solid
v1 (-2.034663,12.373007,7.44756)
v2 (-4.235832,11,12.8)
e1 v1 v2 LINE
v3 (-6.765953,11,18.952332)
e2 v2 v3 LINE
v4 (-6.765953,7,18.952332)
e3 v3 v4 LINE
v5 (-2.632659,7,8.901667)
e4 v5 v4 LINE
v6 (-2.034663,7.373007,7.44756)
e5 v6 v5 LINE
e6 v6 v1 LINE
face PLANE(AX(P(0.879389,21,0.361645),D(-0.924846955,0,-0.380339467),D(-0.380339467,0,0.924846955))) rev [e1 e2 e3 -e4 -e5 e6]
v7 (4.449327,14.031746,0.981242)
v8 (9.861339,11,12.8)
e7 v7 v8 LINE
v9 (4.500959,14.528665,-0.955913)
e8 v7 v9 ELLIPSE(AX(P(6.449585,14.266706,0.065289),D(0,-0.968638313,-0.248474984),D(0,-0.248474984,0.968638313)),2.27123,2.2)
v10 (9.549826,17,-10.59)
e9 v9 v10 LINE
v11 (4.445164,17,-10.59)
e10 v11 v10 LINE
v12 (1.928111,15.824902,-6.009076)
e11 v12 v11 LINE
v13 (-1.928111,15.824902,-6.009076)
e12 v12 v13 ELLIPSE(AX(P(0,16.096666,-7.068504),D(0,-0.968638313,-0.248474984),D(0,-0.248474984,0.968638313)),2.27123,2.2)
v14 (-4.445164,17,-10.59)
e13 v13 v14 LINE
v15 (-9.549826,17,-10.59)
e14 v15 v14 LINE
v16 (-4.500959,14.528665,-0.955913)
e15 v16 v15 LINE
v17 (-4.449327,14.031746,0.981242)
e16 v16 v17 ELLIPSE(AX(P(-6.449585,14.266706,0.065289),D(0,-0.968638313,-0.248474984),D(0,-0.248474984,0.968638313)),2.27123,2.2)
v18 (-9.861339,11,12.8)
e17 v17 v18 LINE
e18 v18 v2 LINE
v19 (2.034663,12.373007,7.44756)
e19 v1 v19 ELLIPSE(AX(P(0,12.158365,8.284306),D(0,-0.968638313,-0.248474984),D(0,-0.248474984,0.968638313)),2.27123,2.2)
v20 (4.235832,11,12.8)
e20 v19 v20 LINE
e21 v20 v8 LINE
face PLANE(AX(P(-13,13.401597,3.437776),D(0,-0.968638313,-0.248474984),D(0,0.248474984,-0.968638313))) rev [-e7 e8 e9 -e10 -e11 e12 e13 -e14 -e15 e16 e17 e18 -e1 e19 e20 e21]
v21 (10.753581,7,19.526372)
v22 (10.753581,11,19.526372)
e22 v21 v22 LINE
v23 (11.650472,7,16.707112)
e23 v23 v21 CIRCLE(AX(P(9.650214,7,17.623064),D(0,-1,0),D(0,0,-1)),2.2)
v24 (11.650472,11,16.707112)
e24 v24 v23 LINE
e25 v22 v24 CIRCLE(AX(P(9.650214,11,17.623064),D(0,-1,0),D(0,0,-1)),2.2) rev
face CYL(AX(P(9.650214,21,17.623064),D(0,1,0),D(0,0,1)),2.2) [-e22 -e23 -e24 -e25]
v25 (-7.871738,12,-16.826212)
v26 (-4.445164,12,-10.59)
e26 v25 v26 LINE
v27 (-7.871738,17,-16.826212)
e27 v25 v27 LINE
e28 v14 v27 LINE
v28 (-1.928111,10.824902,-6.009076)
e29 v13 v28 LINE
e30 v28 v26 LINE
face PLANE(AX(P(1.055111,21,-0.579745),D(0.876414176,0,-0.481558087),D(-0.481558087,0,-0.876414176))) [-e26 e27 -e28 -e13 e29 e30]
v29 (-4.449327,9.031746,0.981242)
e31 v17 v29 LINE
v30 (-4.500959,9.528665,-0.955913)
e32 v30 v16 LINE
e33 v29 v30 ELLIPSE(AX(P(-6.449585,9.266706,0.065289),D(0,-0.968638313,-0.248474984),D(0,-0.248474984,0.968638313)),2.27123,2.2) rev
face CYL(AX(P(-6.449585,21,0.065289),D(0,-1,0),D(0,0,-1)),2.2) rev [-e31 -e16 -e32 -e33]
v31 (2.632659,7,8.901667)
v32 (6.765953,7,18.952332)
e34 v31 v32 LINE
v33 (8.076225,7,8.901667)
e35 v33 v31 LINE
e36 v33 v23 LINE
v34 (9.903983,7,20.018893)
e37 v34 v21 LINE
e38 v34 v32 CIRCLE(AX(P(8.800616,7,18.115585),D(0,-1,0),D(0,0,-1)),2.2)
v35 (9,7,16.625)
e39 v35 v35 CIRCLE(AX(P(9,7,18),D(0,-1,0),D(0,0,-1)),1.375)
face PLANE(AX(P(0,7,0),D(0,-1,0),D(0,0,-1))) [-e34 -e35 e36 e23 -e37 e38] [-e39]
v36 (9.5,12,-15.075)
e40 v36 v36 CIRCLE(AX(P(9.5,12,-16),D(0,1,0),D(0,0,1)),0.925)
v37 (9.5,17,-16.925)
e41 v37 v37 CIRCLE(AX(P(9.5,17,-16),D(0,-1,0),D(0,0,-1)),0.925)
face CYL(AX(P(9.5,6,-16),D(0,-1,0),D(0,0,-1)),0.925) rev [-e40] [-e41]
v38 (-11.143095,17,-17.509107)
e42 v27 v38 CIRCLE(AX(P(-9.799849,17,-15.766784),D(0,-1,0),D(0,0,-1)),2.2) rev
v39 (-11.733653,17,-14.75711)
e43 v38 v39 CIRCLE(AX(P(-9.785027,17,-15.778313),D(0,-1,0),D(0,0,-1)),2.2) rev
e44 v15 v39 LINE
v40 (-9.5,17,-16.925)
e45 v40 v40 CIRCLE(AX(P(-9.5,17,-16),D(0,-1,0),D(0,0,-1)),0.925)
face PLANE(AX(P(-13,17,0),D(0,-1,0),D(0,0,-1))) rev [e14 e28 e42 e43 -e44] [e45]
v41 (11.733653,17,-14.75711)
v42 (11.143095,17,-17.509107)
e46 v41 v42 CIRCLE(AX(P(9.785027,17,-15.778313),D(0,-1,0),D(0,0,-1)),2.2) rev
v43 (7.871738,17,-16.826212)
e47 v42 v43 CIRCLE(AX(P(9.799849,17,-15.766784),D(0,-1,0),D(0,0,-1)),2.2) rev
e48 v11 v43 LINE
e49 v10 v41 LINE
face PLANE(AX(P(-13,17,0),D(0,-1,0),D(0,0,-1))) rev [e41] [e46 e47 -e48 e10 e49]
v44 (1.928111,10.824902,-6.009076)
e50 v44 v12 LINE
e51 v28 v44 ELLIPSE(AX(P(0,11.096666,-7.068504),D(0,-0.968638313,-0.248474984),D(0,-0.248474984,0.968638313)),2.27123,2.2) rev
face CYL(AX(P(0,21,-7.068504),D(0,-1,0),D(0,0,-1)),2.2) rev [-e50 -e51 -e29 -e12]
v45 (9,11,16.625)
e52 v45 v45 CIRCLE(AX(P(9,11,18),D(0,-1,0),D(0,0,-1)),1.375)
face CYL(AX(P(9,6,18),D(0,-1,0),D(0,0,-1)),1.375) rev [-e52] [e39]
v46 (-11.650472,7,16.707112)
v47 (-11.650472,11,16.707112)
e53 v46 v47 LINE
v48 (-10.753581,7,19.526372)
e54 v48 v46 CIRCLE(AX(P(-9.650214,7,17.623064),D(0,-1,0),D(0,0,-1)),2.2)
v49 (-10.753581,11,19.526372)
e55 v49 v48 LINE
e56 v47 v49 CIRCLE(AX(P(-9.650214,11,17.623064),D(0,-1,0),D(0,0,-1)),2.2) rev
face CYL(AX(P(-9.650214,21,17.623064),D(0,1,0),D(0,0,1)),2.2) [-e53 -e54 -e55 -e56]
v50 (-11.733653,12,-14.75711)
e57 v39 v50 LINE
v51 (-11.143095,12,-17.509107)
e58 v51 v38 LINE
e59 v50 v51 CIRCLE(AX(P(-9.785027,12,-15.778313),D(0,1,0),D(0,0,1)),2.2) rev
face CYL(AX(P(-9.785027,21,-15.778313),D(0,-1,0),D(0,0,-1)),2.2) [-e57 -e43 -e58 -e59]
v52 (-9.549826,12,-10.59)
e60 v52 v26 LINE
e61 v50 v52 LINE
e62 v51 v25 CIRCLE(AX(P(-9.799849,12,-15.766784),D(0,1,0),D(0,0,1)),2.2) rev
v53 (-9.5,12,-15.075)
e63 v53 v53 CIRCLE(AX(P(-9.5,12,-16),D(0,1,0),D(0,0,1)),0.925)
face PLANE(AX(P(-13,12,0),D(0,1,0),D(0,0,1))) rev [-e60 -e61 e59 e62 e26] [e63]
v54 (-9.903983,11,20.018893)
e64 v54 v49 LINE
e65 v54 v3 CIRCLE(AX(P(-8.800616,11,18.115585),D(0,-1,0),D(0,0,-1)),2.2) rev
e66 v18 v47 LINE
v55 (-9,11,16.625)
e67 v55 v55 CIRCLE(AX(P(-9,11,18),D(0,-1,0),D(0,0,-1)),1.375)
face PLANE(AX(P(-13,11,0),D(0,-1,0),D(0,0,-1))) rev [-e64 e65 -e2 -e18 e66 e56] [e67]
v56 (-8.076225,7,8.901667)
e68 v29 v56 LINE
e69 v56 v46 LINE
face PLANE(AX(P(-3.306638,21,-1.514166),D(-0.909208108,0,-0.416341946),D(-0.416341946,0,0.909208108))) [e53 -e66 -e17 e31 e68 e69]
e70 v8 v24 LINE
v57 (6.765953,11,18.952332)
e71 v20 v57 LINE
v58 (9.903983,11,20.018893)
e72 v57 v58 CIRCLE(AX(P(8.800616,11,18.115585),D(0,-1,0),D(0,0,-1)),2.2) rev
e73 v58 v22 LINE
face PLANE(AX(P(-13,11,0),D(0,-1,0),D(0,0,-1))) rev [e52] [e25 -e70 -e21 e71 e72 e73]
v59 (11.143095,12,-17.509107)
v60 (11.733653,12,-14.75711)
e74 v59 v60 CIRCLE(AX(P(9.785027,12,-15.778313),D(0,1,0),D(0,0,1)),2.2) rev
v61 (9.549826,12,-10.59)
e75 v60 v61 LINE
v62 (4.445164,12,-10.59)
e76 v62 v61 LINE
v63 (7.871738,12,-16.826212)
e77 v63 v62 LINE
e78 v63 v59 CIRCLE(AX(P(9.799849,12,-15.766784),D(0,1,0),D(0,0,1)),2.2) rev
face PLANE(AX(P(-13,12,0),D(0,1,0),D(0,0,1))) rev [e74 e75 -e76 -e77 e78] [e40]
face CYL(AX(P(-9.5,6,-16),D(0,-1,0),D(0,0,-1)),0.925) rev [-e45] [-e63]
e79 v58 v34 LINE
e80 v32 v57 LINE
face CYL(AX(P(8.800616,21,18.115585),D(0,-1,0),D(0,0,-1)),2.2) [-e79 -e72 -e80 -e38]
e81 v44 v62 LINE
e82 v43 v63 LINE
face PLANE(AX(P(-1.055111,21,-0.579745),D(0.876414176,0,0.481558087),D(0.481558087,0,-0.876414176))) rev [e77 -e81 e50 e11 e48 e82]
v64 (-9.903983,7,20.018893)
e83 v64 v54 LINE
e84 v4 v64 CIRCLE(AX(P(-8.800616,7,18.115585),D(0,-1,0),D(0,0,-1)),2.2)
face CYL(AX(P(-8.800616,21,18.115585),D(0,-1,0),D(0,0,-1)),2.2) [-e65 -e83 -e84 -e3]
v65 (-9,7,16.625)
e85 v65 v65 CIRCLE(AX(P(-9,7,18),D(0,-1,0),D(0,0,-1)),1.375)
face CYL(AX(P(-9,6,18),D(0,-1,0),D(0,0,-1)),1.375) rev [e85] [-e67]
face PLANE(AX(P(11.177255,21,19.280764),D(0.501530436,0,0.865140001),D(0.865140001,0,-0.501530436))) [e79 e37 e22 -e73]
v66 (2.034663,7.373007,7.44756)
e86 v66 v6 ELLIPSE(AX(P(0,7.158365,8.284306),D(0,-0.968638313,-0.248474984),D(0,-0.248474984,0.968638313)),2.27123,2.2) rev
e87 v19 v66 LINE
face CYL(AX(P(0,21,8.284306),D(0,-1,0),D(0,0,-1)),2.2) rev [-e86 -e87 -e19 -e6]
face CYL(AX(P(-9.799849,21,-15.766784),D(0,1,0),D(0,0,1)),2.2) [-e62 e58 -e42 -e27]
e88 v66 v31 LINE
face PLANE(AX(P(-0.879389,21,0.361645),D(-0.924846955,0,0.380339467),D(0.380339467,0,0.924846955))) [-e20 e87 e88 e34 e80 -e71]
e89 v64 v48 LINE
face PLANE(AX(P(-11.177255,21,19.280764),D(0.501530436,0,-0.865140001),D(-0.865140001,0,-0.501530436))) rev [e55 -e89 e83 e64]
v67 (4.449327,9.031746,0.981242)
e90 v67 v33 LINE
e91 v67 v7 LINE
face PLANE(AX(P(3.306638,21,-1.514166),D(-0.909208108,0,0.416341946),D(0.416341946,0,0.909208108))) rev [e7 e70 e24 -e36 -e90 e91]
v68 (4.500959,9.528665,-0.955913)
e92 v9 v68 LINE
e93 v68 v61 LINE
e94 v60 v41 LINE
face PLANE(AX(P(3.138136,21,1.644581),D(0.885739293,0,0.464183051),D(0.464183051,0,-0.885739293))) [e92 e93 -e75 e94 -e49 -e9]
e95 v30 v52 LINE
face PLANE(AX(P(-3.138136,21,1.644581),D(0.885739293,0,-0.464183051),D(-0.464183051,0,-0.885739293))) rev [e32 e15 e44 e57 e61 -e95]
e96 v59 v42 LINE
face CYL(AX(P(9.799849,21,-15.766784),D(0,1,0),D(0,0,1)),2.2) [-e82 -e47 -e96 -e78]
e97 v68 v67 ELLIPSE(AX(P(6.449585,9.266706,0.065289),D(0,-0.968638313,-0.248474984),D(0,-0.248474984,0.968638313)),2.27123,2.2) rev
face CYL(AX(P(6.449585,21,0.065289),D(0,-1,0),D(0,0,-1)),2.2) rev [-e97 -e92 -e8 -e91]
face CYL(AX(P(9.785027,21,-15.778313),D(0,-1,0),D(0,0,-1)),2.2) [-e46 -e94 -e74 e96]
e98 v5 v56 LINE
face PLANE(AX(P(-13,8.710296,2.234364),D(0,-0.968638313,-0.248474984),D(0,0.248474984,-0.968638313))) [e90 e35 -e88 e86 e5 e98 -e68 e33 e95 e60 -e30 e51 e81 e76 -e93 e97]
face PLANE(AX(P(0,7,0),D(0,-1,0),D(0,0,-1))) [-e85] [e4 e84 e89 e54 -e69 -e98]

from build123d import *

# Parameters (mm, degrees)
SKETCH1_W               = 26
SKETCH1_H               = 41
SKETCH1_R               = 1.375
SKETCH1_R_2             = 0.925
SKETCH1_H_2             = 4.4
BOSS_EXTRUDE1_DEPTH     = 6
SKETCH2_R               = 0.925
SKETCH2_R_2             = 1.375
BOSS_EXTRUDE2_DEPTH     = 15
CUT_EXTRUDE2_DEPTH      = 42.677451937
CUT_EXTRUDE2_DEPTH_BACK = 42.677451937
SKETCH4_W               = 26
SKETCH4_H               = 45.4
CUT_EXTRUDE1_DEPTH      = 7
FILLET1_R               = 2.2
FILLET2_R               = 2.2


with BuildPart() as part:
    # Sketch1 → Boss-Extrude1 (new body)
    # profile 1 of 2: a face of its own
    with BuildSketch(Plane(origin=(0, 0, 0), x_dir=(1, 0, 0), z_dir=(0, 1, 0))):
        Rectangle(SKETCH1_W, SKETCH1_H)
        with Locations(Location((-9, -18, 0), (0, 0, 270))):
            Circle(SKETCH1_R, mode=Mode.SUBTRACT)
        with BuildLine():
            ThreePointArc((10.375, -18), (9, -19.375), (7.625, -18))
            ThreePointArc((7.625, -18), (9, -16.625), (10.375, -18))
        make_face(mode=Mode.SUBTRACT)
        with Locations(Location((-9.5, 16, 0), (0, 0, 270))):
            Circle(SKETCH1_R_2, mode=Mode.SUBTRACT)
        with BuildLine():
            ThreePointArc((10.425, 16), (9.5, 15.075), (8.575, 16))
            ThreePointArc((8.575, 16), (9.5, 16.925), (10.425, 16))
        make_face(mode=Mode.SUBTRACT)
    # profile 2 of 2: a face of its own
    with BuildSketch(Plane(origin=(0, 0, 0), x_dir=(1, 0, 0), z_dir=(0, 1, 0))):
        with Locations((0, -22.7)):
            Rectangle(SKETCH1_W, SKETCH1_H_2)
    extrude(amount=BOSS_EXTRUDE1_DEPTH)

    # Sketch2 → Boss-Extrude2 (add)
    # profile 1 of 6: a face of its own
    with BuildSketch(Plane(origin=(0, 6, 0), x_dir=(1, 0, 0), z_dir=(0, 1, 0))):
        Polygon((12.587244228, 16.385905528), (10.85066935, 17.736574878), (9.114094472, 19.087244228), (0, 2.5), (4, 2.5), (4, 0), align=None)
        with BuildLine():
            ThreePointArc((10.425, 16), (8.669058384, 15.593599912), (10.067895068, 16.730150801))
            ThreePointArc((10.067895068, 16.730150801), (10.330941616, 16.406400088), (10.425, 16))
        make_face(mode=Mode.SUBTRACT)
    # profile 2 of 6: a face of its own
    with BuildSketch(Plane(origin=(0, 6, 0), x_dir=(1, 0, 0), z_dir=(0, 1, 0))):
        Polygon((-4, 0), (-4, 2.5), (0, 2.5), (-9.114094472, 19.087244228), (-12.587244228, 16.385905528), align=None)
        with Locations(Location((-9.5, 16, 0), (0, 0, 270))):
            Circle(SKETCH2_R, mode=Mode.SUBTRACT)
    # profile 3 of 6: a face of its own
    with BuildSketch(Plane(origin=(0, 6, 0), x_dir=(1, 0, 0), z_dir=(0, 1, 0))):
        Polygon((0, 2.5), (-4, 2.5), (-4, 0), (-4, -2.5), (0, -2.5), align=None)
    # profile 4 of 6: a face of its own
    with BuildSketch(Plane(origin=(0, 6, 0), x_dir=(1, 0, 0), z_dir=(0, 1, 0))):
        Polygon((4, 2.5), (0, 2.5), (0, -2.5), (4, -2.5), (4, 0), align=None)
    # profile 5 of 6: a face of its own
    with BuildSketch(Plane(origin=(0, 6, 0), x_dir=(1, 0, 0), z_dir=(0, 1, 0))):
        Polygon((12.482501962, -18.524099305), (4, 0), (4, -2.5), (0, -2.5), (7.724231954, -21.282516701), (10.103366958, -19.903308003), align=None)
        with BuildLine():
            ThreePointArc((10.375, -18), (10.191392249, -18.686447019), (9.689604349, -19.189567502))
            ThreePointArc((9.689604349, -19.189567502), (7.808607751, -17.313552981), (10.375, -18))
        make_face(mode=Mode.SUBTRACT)
    # profile 6 of 6: a face of its own
    with BuildSketch(Plane(origin=(0, 6, 0), x_dir=(1, 0, 0), z_dir=(0, 1, 0))):
        Polygon((-4, -2.5), (-4, 0), (-12.482501962, -18.524099305), (-7.724231954, -21.282516701), (0, -2.5), align=None)
        with Locations(Location((-9, -18, 0), (0, 0, 270))):
            Circle(SKETCH2_R_2, mode=Mode.SUBTRACT)
    extrude(amount=BOSS_EXTRUDE2_DEPTH)

    # Sketch6 → Cut-Extrude2 (cut, two sides: drawn at the far end of the back side and taken through both)
    with BuildSketch(Plane(origin=(13, 0, 0), x_dir=(0, 0, -1), z_dir=(1, 0, 0)).offset(-CUT_EXTRUDE2_DEPTH_BACK)):
        Polygon((-21.28, 17), (-21.28, 11), (-12.8, 11), (10.59, 17), align=None)
        Polygon((10.59, 12), (-12.8, 6), (19.09, 6), (19.09, 12), align=None)
        Polygon((-21.28, 21.511868699), (-21.28, 17), (10.59, 17), (19.087244228, 17), (19.087244228, 21.511868699), align=None)
    extrude(amount=CUT_EXTRUDE2_DEPTH + CUT_EXTRUDE2_DEPTH_BACK, mode=Mode.SUBTRACT)

    # Sketch4 → Cut-Extrude1 (cut)
    with BuildSketch(Plane.XZ):
        with Locations((0, 2.2)):
            Rectangle(SKETCH4_W, SKETCH4_H)
    extrude(amount=-CUT_EXTRUDE1_DEPTH, mode=Mode.SUBTRACT)

    # Fillet1
    # the kernel refuses this fillet: 2.2 mm, written as the material it takes off along each edge
    with BuildSketch(Plane(origin=(12.587244228, 7.402722975, -16.385905528), x_dir=(-0.46418305146339667, 0, 0.8857392927572592), z_dir=(0, 1, 0))) as fillet1_piece_1:
        with BuildLine():
            CenterArc((FILLET1_R * 0.83586855008, -FILLET1_R), FILLET1_R, 90, 79.782379698)
            Line((-FILLET1_R * 0.148272552074, -FILLET1_R * 0.822612596131), (0, 0))
            Line((0, 0), (FILLET1_R * 0.83586855008, 0))
        make_face()
    extrude(amount=14.194554051, mode=Mode.SUBTRACT)
    with BuildSketch(Plane(origin=(9.114094472, 5.550330565, -19.087244228), x_dir=(-0.48155808709989106, 0, 0.8764141764877459), z_dir=(0, 1, 0))) as fillet1_piece_2:
        with BuildLine():
            CenterArc((FILLET1_R * 1.17266716994, FILLET1_R), FILLET1_R, 170.912229019, 99.087770981)
            Line((FILLET1_R * 0.185219628956, FILLET1_R * 1.15794731336), (0, 0))
            Line((0, 0), (FILLET1_R * 1.17266716994, 0))
        make_face()
    extrude(amount=17.899338869, mode=Mode.SUBTRACT)
    with BuildSketch(Plane(origin=(-9.114094472, 5.550330565, -19.087244228), x_dir=(0.4815580870998917, 0, 0.8764141764877456), z_dir=(0, 1, 0))) as fillet1_piece_3:
        with BuildLine():
            CenterArc((FILLET1_R * 1.17266716994, -FILLET1_R), FILLET1_R, 90, 99.087770981)
            Line((FILLET1_R * 0.185219628956, -FILLET1_R * 1.15794731336), (0, 0))
            Line((0, 0), (FILLET1_R * 1.17266716994, 0))
        make_face()
    extrude(amount=17.899338869, mode=Mode.SUBTRACT)
    with BuildSketch(Plane(origin=(-12.587244228, 7.402722975, -16.385905528), x_dir=(0.46418305146339667, 0, 0.8857392927572592), z_dir=(0, 1, 0))) as fillet1_piece_4:
        with BuildLine():
            CenterArc((FILLET1_R * 0.83586855008, FILLET1_R), FILLET1_R, 190.217620302, 79.782379698)
            Line((-FILLET1_R * 0.148272552074, FILLET1_R * 0.822612596131), (0, 0))
            Line((0, 0), (FILLET1_R * 0.83586855008, 0))
        make_face()
    extrude(amount=14.194554051, mode=Mode.SUBTRACT)
    with BuildSketch(Plane(origin=(-12.482501962, 2.003928442, 18.524099305), x_dir=(0.4163419464168799, 0, -0.9092081080004752), z_dir=(0, 1, 0))) as fillet1_piece_5:
        with BuildLine():
            CenterArc((FILLET1_R * 0.908376646875, -FILLET1_R), FILLET1_R, 90, 84.502549141)
            Line((-FILLET1_R * 0.087023814771, -FILLET1_R * 0.904198533648), (0, 0))
            Line((0, 0), (FILLET1_R * 0.908376646875, 0))
        make_face()
    extrude(amount=13.992143116, mode=Mode.SUBTRACT)
    with BuildSketch(Plane(origin=(-7.724231954, 0.701160202, 21.282516701), x_dir=(0.3803394674675552, 0, -0.9248469546289788), z_dir=(0, 1, 0))) as fillet1_piece_6:
        with BuildLine():
            CenterArc((FILLET1_R * 1.14524359963, FILLET1_R), FILLET1_R, 172.25340707, 97.74659293)
            Line((FILLET1_R * 0.154369685137, FILLET1_R * 1.13479200861), (0, 0))
            Line((0, 0), (FILLET1_R * 1.14524359963, 0))
        make_face()
    extrude(amount=26.597679596, mode=Mode.SUBTRACT)
    with BuildSketch(Plane(origin=(12.482501962, 2.003928442, 18.524099305), x_dir=(-0.4163419464168806, 0, -0.9092081080004749), z_dir=(0, 1, 0))) as fillet1_piece_7:
        with BuildLine():
            CenterArc((FILLET1_R * 0.908376646875, FILLET1_R), FILLET1_R, 185.497450859, 84.502549141)
            Line((-FILLET1_R * 0.087023814771, FILLET1_R * 0.904198533648), (0, 0))
            Line((0, 0), (FILLET1_R * 0.908376646875, 0))
        make_face()
    extrude(amount=13.992143116, mode=Mode.SUBTRACT)
    with BuildSketch(Plane(origin=(7.724231954, 0.701160202, 21.282516701), x_dir=(-0.38033946746755576, 0, -0.9248469546289787), z_dir=(0, 1, 0))) as fillet1_piece_8:
        with BuildLine():
            CenterArc((FILLET1_R * 1.14524359963, -FILLET1_R), FILLET1_R, 90, 97.74659293)
            Line((FILLET1_R * 0.154369685137, -FILLET1_R * 1.13479200861), (0, 0))
            Line((0, 0), (FILLET1_R * 1.14524359963, 0))
        make_face()
    extrude(amount=26.597679596, mode=Mode.SUBTRACT)

    # Fillet2
    fillet2_edges = [part.edges().sort_by_distance(p)[0] for p in [
        (-4, 11.783454468, 0),
        (0, 12.424754168, -2.5),
        (4, 11.783454468, 0),
        (0, 11.142154767, 2.5),
    ]]
    fillet(fillet2_edges, radius=FILLET2_R)


solid = part.part
